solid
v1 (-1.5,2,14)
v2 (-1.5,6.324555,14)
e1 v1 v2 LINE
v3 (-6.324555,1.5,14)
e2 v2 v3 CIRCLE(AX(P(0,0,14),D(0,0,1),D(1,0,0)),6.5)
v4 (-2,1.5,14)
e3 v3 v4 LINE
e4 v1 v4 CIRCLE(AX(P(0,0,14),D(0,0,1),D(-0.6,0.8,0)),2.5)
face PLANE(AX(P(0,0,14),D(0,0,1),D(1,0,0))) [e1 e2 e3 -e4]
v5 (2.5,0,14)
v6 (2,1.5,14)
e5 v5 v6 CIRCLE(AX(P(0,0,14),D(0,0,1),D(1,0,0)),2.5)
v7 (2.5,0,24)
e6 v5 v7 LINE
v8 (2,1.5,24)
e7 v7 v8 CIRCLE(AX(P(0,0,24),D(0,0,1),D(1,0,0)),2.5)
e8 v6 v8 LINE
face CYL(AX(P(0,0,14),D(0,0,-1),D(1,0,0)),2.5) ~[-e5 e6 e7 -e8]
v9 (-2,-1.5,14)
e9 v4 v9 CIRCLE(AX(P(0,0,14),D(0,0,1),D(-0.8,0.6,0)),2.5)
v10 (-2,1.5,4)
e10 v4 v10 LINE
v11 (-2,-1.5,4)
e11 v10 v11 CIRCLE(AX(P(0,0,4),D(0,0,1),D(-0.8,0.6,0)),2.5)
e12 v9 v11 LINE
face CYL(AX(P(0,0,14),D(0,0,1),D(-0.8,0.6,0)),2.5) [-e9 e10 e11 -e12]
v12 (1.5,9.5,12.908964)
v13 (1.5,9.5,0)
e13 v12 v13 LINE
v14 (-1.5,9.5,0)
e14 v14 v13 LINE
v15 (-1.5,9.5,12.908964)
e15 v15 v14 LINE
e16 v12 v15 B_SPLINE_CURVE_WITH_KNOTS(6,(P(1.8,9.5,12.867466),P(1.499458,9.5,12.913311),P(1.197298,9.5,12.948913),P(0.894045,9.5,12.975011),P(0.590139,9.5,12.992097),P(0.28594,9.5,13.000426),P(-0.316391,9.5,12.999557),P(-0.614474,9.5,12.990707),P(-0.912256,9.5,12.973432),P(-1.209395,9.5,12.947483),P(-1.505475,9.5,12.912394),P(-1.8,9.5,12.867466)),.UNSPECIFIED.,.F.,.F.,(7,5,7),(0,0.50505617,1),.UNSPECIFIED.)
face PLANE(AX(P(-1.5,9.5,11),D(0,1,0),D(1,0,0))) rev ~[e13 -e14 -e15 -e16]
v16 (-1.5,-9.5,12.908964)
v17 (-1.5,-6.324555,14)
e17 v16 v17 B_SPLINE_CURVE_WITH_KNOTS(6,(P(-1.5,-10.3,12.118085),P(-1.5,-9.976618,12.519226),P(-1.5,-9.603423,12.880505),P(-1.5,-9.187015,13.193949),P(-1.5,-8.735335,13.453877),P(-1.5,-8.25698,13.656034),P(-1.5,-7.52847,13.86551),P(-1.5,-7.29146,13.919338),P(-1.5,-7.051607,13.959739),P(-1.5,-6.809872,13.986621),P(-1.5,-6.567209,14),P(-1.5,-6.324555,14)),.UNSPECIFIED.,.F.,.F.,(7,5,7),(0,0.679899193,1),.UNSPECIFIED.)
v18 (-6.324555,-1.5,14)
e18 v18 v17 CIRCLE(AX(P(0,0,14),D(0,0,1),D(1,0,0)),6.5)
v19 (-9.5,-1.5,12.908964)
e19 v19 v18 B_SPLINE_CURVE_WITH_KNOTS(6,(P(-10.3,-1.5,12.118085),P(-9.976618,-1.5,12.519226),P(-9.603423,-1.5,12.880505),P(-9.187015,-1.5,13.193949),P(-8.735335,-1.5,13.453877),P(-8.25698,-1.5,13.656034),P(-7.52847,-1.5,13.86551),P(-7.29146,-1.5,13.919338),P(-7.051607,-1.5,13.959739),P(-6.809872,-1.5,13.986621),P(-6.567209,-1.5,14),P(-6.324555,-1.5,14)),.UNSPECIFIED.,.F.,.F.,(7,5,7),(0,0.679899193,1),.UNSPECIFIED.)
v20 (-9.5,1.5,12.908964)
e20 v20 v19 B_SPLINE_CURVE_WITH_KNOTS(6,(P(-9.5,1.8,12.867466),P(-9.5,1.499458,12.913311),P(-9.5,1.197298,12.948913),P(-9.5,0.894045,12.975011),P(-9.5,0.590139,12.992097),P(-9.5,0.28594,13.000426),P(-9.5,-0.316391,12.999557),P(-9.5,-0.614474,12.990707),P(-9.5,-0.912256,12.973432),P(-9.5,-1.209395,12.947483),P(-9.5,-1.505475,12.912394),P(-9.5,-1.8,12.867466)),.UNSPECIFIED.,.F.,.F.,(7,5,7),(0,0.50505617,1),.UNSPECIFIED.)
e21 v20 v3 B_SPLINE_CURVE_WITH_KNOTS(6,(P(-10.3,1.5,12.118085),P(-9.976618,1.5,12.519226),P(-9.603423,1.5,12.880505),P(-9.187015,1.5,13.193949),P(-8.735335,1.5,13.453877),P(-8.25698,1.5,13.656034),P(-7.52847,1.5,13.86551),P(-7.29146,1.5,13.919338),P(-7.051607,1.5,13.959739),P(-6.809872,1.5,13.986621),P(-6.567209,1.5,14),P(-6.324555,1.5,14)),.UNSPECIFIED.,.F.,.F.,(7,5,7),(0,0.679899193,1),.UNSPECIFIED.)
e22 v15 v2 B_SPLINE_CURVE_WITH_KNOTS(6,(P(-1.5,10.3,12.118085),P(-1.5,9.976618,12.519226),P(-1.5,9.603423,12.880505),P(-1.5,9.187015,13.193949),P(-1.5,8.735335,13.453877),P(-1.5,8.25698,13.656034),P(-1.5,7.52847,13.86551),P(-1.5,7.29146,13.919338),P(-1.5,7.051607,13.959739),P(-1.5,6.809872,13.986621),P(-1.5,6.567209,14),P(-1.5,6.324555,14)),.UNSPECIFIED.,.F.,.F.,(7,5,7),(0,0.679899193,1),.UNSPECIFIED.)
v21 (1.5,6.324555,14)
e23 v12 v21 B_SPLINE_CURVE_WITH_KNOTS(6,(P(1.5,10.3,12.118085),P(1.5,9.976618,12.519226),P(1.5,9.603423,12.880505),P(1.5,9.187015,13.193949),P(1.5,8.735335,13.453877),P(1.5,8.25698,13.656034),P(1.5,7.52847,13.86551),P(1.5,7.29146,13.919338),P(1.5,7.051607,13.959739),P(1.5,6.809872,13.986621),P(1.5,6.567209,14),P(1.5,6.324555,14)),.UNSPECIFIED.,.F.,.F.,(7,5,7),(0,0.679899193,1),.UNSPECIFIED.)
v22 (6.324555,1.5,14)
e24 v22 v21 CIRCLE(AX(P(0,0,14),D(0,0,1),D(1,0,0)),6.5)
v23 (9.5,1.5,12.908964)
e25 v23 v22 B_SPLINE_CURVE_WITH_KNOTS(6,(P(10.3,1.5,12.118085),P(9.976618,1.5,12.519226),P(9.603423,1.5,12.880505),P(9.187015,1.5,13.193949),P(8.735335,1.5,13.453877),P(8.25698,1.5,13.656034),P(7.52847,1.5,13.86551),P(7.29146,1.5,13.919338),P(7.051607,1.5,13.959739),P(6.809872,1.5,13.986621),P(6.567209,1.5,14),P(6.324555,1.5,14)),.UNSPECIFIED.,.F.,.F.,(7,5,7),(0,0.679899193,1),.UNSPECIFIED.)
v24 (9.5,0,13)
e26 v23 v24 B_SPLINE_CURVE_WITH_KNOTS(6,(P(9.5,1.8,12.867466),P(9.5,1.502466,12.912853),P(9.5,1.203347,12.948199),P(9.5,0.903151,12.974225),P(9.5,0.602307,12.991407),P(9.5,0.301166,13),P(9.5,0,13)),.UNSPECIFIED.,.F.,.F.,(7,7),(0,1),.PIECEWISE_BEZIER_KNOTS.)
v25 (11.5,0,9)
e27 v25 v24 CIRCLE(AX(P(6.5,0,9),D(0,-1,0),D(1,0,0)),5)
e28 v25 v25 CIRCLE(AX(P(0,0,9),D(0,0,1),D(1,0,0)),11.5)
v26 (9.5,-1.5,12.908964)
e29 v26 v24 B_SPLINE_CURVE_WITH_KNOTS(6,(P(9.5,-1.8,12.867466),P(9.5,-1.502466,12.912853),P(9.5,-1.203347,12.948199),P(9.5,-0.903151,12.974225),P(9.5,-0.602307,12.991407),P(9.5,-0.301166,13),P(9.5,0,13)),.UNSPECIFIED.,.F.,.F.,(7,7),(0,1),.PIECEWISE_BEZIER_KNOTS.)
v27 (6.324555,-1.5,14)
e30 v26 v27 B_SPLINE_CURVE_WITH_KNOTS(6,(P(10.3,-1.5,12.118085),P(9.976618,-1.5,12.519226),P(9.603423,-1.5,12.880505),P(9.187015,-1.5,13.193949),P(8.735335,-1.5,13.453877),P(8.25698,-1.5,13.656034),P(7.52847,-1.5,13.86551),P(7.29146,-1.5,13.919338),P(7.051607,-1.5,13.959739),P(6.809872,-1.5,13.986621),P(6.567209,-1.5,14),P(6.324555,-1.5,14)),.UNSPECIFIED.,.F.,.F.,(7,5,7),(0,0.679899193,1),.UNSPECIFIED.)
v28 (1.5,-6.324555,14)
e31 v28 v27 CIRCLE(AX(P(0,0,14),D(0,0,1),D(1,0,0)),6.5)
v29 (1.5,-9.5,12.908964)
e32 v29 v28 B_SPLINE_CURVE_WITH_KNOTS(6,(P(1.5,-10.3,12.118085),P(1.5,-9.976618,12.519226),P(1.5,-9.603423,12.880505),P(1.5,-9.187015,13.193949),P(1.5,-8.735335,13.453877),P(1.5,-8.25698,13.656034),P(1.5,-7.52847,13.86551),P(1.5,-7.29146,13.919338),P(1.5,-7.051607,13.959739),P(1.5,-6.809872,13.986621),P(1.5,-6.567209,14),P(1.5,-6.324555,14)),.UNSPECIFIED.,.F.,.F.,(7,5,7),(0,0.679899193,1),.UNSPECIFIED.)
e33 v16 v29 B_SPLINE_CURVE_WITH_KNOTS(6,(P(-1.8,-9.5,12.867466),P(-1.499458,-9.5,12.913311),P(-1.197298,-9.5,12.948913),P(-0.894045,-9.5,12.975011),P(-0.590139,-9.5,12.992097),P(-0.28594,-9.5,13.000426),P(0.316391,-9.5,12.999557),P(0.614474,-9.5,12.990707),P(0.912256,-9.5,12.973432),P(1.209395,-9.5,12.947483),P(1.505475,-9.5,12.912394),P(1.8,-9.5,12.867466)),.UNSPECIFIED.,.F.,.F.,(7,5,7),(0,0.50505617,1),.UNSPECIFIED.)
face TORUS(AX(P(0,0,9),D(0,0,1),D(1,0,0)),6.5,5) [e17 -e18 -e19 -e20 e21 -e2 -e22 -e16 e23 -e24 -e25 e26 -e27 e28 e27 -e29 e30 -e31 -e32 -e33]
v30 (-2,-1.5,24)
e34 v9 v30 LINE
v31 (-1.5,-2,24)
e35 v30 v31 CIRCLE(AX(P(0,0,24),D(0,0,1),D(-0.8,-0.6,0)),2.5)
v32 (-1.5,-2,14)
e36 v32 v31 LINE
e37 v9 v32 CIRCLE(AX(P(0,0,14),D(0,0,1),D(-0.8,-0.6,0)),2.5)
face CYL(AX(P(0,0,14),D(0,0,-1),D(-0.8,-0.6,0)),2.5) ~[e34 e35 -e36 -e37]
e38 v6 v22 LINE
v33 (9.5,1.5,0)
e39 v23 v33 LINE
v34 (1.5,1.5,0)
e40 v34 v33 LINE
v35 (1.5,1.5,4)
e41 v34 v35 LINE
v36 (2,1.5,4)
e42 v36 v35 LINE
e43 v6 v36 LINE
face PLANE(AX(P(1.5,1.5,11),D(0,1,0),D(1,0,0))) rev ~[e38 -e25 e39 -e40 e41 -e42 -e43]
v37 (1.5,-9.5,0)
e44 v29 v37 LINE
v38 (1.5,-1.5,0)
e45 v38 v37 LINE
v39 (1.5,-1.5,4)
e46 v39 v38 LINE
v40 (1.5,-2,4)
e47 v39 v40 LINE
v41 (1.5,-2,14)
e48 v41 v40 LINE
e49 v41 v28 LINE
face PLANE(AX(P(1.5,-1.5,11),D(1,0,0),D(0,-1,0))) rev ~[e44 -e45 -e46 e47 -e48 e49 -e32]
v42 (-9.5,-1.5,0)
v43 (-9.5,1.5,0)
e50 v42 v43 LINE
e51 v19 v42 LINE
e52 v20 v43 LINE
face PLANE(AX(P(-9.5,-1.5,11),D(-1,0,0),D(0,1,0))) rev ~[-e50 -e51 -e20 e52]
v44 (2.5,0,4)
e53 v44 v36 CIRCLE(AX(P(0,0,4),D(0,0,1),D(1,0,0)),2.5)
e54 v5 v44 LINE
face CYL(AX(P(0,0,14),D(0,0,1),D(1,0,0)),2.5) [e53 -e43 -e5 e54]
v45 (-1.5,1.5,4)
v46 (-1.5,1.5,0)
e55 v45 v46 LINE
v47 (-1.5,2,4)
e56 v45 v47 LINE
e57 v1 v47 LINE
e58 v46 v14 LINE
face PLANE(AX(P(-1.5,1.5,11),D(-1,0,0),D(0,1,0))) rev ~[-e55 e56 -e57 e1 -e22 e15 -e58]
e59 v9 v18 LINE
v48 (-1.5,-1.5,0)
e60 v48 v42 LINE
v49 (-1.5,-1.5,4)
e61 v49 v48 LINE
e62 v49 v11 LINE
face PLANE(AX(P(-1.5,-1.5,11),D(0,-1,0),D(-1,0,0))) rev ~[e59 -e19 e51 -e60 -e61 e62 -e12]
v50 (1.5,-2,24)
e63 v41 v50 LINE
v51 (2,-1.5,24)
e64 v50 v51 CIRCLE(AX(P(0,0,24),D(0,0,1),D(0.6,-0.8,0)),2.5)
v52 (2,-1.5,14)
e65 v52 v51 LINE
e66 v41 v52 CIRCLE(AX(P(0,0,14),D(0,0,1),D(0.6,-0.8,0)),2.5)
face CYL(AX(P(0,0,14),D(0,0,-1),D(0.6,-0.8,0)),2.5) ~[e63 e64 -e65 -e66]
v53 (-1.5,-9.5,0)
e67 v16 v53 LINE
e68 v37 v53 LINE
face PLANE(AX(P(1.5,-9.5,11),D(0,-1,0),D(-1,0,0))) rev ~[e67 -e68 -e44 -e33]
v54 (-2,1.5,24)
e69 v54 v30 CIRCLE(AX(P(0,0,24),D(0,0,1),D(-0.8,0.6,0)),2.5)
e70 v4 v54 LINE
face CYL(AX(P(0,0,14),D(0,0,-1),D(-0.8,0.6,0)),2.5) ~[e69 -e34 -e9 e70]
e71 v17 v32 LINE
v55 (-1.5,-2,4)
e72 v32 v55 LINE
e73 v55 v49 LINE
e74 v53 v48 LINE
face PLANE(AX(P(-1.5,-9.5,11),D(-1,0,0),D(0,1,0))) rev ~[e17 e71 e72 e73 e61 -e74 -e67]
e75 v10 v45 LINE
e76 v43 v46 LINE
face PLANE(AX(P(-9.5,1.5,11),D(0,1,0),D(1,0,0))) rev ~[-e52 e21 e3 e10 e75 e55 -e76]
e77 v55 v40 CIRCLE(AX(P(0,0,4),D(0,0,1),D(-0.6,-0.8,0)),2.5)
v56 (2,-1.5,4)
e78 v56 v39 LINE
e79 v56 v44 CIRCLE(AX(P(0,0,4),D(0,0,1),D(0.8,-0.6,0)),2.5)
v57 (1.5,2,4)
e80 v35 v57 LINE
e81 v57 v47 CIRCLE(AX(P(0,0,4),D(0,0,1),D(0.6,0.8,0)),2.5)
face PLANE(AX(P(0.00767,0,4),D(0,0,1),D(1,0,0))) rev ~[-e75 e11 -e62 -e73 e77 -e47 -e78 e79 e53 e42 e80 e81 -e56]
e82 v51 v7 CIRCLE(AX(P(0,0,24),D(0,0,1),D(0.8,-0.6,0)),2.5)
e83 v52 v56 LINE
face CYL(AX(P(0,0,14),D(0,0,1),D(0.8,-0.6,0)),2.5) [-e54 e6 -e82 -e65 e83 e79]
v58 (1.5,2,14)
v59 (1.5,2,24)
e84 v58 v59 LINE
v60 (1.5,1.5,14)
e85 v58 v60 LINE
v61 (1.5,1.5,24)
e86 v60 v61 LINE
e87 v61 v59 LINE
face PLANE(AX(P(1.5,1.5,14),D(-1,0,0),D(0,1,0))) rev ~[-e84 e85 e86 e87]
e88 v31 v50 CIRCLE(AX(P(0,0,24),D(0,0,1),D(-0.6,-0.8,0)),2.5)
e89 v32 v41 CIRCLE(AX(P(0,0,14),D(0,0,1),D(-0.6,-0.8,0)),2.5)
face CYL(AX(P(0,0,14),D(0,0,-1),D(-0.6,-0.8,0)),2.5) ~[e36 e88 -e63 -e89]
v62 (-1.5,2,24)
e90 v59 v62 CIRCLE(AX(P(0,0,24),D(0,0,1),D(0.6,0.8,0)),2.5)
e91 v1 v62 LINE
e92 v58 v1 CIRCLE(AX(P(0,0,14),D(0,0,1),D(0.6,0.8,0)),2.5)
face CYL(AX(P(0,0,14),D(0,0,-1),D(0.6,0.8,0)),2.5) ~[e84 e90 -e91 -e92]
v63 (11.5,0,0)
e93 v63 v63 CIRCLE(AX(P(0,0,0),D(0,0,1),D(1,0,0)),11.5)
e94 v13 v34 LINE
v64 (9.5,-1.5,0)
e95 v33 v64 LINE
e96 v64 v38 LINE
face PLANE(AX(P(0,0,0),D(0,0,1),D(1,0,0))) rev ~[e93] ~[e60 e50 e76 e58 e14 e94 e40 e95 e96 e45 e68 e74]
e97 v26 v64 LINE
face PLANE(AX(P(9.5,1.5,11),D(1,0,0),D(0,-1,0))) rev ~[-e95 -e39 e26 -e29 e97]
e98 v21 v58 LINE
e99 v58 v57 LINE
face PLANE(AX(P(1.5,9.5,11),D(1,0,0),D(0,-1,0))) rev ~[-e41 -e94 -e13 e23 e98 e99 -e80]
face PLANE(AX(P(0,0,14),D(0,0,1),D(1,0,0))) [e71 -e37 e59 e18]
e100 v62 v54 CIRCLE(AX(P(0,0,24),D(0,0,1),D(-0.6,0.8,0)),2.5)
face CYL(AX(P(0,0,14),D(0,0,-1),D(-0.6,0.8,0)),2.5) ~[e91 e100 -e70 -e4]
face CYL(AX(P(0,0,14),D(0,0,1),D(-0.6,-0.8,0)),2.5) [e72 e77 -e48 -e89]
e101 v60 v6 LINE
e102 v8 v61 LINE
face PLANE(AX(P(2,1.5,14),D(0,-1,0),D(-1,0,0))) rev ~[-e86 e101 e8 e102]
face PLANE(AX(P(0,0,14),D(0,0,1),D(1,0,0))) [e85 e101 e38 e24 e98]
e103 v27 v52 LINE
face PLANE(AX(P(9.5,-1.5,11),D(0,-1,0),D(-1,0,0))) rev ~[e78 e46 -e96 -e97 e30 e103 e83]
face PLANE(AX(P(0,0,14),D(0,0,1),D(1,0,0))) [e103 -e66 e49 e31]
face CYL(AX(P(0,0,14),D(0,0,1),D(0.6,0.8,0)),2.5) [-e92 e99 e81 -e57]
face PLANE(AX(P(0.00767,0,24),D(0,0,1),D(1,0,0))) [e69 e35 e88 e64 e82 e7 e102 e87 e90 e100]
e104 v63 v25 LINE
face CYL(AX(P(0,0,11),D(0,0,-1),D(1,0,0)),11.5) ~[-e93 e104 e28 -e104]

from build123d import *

# Parameters (mm, degrees)
F0_R     = 11.5
F1_DEPTH = 11
F2_R     = 11.5
F3_DEPTH = 3
F6_DEPTH = 10


# Not quite as in the source:
# - a fillet or chamfer that OpenCascade refuses, or shapes differently, is made with other operations: its cross-section is extruded or revolved along the edge and cut away or added


with BuildPart() as f1:
    # F0 (on Top) → F1 (new body)
    with BuildSketch(Plane.XY):
        Circle(F0_R)
        Polygon((9.5, 1.5), (9.5, -1.5), (1.5, -1.5), (1.5, -9.5), (-1.5, -9.5), (-1.5, -1.5), (-9.5, -1.5), (-9.5, 1.5), (-1.5, 1.5), (-1.5, 9.5), (1.5, 9.5), (1.5, 1.5), align=None, mode=Mode.SUBTRACT)
    extrude(amount=F1_DEPTH)

    # F2 (on face) → F3 (join)
    with BuildSketch(Plane.XY.offset(11)):
        Circle(F2_R)
        Polygon((1.5, 1.5), (9.5, 1.5), (9.5, -1.5), (1.5, -1.5), (1.5, -9.5), (-1.5, -9.5), (-1.5, -1.5), (-9.5, -1.5), (-9.5, 1.5), (-1.5, 1.5), (-1.5, 9.5), (1.5, 9.5), align=None, mode=Mode.SUBTRACT)
    extrude(amount=F3_DEPTH)

    # F4: fillet of radius 5 on 1 edges, made by hand

    # F4_s1 → F4_t2 (revolve, cut)
    with BuildSketch(Plane.XZ):
        with BuildLine():
            ThreePointArc((11.5, 9), (10.0355339059, 12.5355339059), (6.5, 14))
            Line((6.5, 14), (11.5, 14))
            Line((11.5, 14), (11.5, 9))
        make_face()
    revolve(axis=Axis((0, 0, 14), (0, 0, 1)), mode=Mode.SUBTRACT)

    # F5 (on face) → F6 (join, symmetric)
    with BuildSketch(Plane.XY.offset(14)):
        with BuildLine():
            ThreePointArc((2, -1.5), (2.3717082451, -0.790569415), (2.5, 0))
            ThreePointArc((2.5, 0), (2.3717082451, 0.790569415), (2, 1.5))
            Line((2, 1.5), (1.5, 1.5))
            Line((1.5, 1.5), (1.5, 2))
            ThreePointArc((1.5, 2), (0, 2.5), (-1.5, 2))
            Line((-1.5, 2), (-1.5, 1.5))
            Line((-1.5, 1.5), (-2, 1.5))
            ThreePointArc((-2, 1.5), (-2.5, 0), (-2, -1.5))
            Line((-2, -1.5), (-1.5, -1.5))
            Line((-1.5, -1.5), (-1.5, -2))
            ThreePointArc((-1.5, -2), (0, -2.5), (1.5, -2))
            Line((1.5, -2), (1.5, -1.5))
            Line((1.5, -1.5), (2, -1.5))
        make_face()
        with BuildLine():
            ThreePointArc((1.5, -2), (1.767766953, -1.767766953), (2, -1.5))
            Line((2, -1.5), (1.5, -1.5))
            Line((1.5, -1.5), (1.5, -2))
        make_face()
        with BuildLine():
            Line((-1.5, 1.5), (-1.5, 2))
            ThreePointArc((-1.5, 2), (-1.767766953, 1.767766953), (-2, 1.5))
            Line((-2, 1.5), (-1.5, 1.5))
        make_face()
        with BuildLine():
            ThreePointArc((-2, -1.5), (-1.767766953, -1.767766953), (-1.5, -2))
            Line((-1.5, -2), (-1.5, -1.5))
            Line((-1.5, -1.5), (-2, -1.5))
        make_face()
    extrude(amount=F6_DEPTH, both=True)


solid = f1.part
